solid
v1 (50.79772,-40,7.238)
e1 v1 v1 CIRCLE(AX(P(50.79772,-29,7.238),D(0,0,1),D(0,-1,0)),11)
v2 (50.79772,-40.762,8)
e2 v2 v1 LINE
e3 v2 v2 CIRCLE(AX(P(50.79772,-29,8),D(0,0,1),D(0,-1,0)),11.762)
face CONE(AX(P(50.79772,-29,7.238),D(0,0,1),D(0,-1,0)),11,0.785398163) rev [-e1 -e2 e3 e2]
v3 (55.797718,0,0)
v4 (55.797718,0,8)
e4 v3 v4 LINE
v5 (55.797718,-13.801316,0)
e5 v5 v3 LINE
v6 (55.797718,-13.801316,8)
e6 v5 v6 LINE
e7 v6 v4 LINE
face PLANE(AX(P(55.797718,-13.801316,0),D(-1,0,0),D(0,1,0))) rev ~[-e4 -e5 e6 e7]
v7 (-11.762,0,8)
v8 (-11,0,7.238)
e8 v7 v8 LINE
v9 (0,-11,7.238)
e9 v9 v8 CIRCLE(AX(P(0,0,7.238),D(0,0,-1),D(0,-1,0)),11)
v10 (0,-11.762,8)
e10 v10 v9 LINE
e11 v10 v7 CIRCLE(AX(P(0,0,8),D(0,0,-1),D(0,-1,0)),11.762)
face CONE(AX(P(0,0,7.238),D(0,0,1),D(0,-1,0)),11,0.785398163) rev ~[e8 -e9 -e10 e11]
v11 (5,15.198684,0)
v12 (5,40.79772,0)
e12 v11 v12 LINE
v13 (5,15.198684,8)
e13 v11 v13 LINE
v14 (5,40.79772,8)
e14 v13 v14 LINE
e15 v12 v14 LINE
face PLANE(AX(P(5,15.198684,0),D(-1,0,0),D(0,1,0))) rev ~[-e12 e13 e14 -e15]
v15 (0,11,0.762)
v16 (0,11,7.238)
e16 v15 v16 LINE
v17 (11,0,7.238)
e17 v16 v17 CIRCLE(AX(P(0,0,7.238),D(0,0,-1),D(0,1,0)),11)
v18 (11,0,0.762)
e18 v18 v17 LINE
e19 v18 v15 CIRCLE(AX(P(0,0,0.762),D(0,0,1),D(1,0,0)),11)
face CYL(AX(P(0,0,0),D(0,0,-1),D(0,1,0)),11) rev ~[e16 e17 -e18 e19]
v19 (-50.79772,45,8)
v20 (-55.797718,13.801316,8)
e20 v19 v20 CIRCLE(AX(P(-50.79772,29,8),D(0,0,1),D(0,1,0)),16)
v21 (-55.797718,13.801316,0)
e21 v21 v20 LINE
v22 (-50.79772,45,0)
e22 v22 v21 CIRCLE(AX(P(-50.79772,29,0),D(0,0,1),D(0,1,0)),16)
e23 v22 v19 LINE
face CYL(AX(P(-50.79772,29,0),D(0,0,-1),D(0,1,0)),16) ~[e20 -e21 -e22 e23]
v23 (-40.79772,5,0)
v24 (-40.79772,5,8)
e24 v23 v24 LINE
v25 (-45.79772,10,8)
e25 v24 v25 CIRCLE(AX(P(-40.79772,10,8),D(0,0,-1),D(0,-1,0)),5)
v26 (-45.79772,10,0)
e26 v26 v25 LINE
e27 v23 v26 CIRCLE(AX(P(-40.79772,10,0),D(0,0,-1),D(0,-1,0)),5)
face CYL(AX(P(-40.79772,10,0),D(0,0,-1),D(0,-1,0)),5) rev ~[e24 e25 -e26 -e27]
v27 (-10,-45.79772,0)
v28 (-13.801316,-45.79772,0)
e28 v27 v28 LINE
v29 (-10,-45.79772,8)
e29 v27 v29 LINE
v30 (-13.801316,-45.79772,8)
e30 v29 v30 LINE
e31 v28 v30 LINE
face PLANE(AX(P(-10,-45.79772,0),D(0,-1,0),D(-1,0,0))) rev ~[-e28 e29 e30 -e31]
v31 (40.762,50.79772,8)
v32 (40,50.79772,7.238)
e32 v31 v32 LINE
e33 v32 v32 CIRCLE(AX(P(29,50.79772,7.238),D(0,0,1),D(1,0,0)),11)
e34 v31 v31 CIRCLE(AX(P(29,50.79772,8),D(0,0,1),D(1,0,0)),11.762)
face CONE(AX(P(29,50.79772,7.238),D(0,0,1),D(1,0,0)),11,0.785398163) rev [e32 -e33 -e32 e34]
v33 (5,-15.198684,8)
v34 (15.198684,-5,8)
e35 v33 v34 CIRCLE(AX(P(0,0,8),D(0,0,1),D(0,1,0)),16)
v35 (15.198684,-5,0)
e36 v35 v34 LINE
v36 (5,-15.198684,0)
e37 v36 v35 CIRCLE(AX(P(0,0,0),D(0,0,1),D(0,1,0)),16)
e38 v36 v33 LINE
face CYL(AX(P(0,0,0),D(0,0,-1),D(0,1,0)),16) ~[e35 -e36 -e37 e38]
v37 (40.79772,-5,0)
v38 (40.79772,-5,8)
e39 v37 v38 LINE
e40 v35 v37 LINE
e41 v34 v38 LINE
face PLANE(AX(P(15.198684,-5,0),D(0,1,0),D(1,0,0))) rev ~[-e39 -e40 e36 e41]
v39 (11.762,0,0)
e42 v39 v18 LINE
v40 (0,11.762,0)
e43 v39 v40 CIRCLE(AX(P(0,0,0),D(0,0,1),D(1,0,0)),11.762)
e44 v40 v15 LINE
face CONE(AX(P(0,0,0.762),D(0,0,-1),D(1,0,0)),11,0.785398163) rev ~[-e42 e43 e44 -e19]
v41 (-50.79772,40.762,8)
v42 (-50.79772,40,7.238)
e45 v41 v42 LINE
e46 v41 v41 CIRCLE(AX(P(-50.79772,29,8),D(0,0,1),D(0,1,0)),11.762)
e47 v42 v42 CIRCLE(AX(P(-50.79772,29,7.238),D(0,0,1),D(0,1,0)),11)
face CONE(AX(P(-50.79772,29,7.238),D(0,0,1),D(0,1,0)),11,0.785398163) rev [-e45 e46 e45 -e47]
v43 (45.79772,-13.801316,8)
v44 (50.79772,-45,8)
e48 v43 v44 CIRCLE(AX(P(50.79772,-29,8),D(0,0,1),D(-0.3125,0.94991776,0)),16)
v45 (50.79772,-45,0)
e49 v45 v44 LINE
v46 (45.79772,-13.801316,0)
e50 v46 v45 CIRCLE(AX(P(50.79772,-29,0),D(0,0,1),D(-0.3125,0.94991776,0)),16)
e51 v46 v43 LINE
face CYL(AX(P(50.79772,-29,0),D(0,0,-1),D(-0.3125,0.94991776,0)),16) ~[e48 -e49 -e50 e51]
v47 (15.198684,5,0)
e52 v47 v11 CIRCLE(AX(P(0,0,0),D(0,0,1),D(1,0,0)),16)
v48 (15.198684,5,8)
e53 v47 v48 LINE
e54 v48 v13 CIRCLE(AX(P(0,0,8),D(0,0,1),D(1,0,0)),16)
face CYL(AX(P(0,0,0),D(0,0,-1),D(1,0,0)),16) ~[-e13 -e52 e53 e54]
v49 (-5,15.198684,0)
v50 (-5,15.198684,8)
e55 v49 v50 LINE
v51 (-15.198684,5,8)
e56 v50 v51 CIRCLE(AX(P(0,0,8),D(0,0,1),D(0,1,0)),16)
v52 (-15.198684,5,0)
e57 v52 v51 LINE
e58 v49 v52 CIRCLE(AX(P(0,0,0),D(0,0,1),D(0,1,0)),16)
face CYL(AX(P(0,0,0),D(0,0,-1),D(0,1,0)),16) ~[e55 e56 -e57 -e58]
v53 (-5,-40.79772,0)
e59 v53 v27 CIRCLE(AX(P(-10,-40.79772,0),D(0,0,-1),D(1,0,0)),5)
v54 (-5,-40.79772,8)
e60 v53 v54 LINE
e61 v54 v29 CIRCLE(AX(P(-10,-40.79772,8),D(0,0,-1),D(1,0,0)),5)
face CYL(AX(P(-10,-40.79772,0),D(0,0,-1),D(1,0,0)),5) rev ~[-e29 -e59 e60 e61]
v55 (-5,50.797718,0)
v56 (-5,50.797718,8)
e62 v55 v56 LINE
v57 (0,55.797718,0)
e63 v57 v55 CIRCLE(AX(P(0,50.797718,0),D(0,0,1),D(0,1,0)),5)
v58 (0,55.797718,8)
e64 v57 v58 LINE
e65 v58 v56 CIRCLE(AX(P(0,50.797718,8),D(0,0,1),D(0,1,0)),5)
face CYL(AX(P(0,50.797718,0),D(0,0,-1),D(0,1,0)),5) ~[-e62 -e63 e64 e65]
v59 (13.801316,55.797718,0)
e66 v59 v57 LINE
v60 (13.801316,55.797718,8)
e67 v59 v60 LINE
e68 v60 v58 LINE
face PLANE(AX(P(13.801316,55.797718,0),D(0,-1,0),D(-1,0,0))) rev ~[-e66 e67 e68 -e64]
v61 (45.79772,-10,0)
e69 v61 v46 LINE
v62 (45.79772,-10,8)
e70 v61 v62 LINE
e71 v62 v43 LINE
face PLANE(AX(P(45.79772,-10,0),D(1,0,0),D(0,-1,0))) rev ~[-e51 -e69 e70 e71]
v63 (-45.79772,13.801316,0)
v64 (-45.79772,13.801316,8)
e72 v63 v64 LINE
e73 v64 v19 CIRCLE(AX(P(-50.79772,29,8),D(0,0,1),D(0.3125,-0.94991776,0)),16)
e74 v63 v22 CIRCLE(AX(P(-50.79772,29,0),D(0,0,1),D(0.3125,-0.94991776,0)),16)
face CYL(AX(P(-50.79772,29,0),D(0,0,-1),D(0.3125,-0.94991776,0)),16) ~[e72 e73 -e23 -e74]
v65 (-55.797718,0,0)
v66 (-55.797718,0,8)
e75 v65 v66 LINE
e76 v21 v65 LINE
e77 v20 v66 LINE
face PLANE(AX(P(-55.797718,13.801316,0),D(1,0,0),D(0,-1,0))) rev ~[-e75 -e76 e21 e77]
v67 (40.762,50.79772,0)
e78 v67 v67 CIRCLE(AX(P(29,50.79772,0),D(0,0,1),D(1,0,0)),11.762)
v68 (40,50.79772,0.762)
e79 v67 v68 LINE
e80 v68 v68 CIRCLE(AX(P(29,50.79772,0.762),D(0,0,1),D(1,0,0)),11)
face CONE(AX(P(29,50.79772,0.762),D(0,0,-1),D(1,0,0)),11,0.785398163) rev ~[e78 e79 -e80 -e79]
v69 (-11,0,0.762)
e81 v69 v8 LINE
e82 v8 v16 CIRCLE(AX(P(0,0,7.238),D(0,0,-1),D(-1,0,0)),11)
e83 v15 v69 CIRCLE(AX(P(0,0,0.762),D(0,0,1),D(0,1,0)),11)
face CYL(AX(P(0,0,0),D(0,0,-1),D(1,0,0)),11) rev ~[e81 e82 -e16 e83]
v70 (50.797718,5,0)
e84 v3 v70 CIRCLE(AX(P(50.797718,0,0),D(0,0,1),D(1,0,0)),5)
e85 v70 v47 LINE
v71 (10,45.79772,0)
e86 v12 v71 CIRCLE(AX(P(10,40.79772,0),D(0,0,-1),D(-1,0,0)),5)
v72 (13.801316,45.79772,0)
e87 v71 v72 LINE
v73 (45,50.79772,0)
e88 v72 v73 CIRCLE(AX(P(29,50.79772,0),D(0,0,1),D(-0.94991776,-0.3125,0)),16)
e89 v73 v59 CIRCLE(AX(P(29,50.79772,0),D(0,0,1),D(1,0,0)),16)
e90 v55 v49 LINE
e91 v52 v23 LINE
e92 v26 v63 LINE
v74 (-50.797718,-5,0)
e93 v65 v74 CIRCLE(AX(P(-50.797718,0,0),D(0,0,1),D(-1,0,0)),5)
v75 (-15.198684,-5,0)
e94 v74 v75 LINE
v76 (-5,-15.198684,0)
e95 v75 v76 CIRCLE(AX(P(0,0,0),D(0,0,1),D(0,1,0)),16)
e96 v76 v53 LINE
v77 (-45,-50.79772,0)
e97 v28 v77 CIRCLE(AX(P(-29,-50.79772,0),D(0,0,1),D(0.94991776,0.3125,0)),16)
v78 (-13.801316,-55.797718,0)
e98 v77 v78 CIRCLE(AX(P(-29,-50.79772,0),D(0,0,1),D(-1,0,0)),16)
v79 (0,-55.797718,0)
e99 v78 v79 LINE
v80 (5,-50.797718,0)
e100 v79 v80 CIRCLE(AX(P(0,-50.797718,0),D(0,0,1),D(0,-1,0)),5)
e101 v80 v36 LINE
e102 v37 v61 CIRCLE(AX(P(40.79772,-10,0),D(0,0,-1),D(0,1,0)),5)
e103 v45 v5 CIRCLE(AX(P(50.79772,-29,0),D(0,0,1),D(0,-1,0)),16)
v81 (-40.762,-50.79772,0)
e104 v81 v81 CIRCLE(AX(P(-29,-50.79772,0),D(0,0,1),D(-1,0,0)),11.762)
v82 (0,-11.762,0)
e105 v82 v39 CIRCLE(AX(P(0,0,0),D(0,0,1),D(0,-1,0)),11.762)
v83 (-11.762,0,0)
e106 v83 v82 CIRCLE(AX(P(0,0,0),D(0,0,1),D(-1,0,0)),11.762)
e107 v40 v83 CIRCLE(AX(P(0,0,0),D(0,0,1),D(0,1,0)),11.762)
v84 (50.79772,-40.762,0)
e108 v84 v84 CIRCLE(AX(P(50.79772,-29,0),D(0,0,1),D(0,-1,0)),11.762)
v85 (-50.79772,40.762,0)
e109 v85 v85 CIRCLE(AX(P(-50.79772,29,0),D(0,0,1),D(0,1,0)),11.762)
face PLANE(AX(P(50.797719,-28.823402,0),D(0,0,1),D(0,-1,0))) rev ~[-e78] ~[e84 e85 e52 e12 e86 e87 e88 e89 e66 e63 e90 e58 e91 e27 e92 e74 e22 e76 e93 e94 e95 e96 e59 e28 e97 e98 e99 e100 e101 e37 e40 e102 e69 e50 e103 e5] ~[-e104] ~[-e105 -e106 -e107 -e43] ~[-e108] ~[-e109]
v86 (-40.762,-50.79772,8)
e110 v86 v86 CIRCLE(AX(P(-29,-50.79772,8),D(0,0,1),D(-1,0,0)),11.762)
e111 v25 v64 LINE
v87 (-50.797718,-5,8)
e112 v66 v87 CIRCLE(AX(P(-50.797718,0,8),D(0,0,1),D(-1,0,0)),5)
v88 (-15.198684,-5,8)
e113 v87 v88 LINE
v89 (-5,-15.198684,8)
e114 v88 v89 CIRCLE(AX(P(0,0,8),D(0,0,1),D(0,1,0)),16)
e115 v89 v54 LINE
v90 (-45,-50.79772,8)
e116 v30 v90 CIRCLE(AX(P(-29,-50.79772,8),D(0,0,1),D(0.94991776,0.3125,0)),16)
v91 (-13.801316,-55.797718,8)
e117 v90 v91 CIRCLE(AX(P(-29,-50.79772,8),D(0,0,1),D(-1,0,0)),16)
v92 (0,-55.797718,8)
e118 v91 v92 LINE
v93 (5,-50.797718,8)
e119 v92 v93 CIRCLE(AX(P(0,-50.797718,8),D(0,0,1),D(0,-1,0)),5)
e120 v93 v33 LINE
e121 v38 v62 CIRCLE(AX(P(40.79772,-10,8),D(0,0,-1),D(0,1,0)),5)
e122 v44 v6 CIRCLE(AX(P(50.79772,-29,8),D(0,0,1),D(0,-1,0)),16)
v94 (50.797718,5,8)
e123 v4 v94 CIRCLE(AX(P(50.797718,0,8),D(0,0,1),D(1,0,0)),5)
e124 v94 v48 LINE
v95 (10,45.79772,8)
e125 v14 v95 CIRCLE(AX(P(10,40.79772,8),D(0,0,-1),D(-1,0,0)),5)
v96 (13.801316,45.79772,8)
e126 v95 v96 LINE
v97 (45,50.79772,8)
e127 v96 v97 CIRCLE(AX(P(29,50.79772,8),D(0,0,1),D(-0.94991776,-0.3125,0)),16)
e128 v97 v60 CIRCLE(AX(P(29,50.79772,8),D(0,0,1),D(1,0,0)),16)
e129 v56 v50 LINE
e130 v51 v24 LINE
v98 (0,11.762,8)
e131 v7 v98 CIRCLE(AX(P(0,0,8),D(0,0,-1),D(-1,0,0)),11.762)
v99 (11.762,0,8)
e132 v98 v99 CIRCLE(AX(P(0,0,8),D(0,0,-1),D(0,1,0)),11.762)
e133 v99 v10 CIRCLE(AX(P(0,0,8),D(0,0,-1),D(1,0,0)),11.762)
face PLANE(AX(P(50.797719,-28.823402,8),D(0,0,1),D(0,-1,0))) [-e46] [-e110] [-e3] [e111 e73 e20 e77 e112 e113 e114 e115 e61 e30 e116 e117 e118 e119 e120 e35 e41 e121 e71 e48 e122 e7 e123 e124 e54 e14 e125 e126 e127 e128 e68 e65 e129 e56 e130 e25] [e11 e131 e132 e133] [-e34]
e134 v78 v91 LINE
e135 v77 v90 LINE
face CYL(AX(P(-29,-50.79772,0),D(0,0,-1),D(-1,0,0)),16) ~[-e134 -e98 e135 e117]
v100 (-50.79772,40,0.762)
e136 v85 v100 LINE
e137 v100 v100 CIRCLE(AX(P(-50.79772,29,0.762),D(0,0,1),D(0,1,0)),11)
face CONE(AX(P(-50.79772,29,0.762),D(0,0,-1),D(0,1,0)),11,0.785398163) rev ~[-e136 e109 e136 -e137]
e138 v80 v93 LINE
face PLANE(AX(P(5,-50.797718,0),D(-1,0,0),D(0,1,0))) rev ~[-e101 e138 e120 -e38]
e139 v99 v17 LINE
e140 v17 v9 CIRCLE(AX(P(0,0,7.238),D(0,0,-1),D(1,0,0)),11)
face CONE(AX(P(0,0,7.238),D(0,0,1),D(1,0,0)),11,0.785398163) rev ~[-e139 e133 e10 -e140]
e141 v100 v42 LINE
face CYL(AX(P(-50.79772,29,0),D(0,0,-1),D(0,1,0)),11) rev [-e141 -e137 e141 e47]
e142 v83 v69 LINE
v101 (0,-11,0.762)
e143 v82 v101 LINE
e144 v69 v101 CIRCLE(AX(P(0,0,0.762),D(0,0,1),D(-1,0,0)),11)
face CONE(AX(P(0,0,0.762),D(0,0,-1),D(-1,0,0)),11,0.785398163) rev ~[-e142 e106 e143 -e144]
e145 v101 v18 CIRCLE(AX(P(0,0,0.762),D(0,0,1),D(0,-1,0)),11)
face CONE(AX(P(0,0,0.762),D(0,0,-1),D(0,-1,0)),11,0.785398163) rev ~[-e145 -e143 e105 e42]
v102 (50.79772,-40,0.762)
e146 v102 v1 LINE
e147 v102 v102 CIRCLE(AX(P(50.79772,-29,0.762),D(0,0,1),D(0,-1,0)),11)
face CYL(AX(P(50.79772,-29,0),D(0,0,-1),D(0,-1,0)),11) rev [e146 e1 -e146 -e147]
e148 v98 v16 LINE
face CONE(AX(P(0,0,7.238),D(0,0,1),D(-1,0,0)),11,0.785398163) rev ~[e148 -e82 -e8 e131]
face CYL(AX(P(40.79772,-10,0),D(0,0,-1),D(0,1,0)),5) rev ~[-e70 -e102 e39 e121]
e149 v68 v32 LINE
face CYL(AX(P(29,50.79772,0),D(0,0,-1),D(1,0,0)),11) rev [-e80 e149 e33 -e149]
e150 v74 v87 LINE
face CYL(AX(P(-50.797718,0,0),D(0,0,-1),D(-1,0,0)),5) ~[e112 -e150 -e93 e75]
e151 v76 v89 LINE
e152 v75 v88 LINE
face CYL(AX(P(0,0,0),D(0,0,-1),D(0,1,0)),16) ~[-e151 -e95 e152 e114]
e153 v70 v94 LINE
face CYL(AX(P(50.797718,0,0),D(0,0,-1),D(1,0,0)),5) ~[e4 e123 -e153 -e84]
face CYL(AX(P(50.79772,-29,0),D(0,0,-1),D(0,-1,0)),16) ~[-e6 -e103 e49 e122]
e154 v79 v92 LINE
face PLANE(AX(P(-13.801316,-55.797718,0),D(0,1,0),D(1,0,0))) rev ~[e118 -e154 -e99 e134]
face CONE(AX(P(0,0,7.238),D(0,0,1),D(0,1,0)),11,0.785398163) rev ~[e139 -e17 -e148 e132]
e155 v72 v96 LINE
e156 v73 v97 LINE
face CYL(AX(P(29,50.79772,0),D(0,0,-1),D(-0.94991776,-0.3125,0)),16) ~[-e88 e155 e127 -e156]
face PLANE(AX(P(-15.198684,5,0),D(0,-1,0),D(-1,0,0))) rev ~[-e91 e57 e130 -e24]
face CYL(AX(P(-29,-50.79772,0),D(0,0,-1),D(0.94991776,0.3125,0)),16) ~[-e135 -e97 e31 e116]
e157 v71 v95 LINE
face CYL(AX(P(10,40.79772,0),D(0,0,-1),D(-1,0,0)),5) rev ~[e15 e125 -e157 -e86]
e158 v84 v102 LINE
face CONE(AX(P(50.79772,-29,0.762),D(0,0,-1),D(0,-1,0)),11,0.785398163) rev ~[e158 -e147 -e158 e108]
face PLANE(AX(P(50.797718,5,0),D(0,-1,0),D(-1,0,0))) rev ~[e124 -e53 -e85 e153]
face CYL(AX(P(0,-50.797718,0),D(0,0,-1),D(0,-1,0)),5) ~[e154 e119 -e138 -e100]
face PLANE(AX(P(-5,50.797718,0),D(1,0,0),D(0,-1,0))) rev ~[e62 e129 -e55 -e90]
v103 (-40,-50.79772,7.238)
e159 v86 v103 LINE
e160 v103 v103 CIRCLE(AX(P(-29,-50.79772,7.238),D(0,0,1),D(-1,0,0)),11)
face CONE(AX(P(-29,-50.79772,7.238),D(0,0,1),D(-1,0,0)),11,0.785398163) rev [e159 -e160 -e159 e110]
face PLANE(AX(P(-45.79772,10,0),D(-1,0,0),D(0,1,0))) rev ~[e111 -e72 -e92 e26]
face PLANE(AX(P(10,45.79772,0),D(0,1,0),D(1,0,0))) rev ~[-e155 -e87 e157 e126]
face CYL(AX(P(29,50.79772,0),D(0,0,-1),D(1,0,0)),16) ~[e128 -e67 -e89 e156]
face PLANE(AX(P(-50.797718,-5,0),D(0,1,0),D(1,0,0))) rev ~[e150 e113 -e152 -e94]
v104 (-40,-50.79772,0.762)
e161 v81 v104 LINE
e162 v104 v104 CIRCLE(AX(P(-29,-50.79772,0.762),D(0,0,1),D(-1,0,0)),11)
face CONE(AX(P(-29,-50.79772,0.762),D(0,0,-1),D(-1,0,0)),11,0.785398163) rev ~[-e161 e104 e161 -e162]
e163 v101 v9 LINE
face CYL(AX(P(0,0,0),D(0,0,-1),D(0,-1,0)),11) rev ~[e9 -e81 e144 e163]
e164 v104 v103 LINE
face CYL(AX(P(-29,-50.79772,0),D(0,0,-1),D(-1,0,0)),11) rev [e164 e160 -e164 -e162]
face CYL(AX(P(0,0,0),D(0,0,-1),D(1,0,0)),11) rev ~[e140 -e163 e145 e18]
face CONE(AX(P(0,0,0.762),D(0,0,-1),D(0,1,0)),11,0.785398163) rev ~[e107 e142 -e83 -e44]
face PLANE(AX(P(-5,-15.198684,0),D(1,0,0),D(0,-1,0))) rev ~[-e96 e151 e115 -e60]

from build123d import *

# Parameters (mm, degrees)
F0_R     = 11
F1_DEPTH = 8
F3_COUNT = 4
F4_SIZE  = 0.762


# Not quite as in the source:
# - a feature names something its author has since deleted; it is built from what else it names


with BuildPart() as f1:
    # F0 (on Top) → F1 (new body)
    with BuildSketch(Plane.XY):
        with BuildLine():
            ThreePointArc((13.801315615, 55.7977184653), (13.2015990543, 53.3296207755), (13.0000001118, 50.7977195084))
            ThreePointArc((13.0000001118, 50.7977195084), (13.2015991411, 48.2658176992), (13.8013159582, 45.7977195084))
            ThreePointArc((13.8013159582, 45.7977195084), (31.531901921, 34.9993185378), (45.0000001118, 50.7977195084))
            ThreePointArc((45.0000001118, 50.7977195084), (31.5319013788, 66.5961205659), (13.801315615, 55.7977184653))
        make_face()
        with Locations((29.0000001118, 50.7977195084)):
            Circle(F0_R, mode=Mode.SUBTRACT)
        with BuildLine():
            Line((0, 50.7977195084), (0, 16))
            ThreePointArc((0, 16), (2.5319018092, 15.7984009706), (5, 15.1986841536))
            Line((5, 15.1986841536), (5, 40.7977195084))
            ThreePointArc((5, 40.7977195084), (6.4644660941, 44.3332534143), (10, 45.7977195084))
            Line((10, 45.7977195084), (13.8013159582, 45.7977195084))
            ThreePointArc((13.8013159582, 45.7977195084), (13.2015991411, 48.2658176992), (13.0000001118, 50.7977195084))
            Line((13.0000001118, 50.7977195084), (0, 50.7977195084))
        make_face()
        with BuildLine():
            ThreePointArc((-4.9999998882, 15.1986841903), (-2.5319017511, 15.7984009799), (0, 16))
            Line((0, 16), (0, 50.7977195084))
            Line((0, 50.7977195084), (13.0000001118, 50.7977195084))
            ThreePointArc((13.0000001118, 50.7977195084), (13.2015990543, 53.3296207755), (13.801315615, 55.7977184653))
            Line((13.801315615, 55.7977184653), (1.118e-07, 55.7977184653))
            ThreePointArc((1.118e-07, 55.7977184653), (-3.5355337942, 54.3332523713), (-4.9999998882, 50.7977184653))
            Line((-4.9999998882, 50.7977184653), (-4.9999998882, 15.1986841903))
        make_face()
        with BuildLine():
            ThreePointArc((5, 15.1986841536), (2.5319018092, 15.7984009706), (0, 16))
            ThreePointArc((0, 16), (-2.5319017511, 15.7984009799), (-4.9999998882, 15.1986841903))
            ThreePointArc((-4.9999998882, 15.1986841903), (-9.3808315673, -12.9614813623), (16, 0))
            ThreePointArc((16, 0), (12.9614813968, 9.3808315196), (5, 15.1986841536))
        make_face()
        with BuildLine():
            ThreePointArc((0, 11), (7.7781745931, 7.7781745931), (11, 0))
            ThreePointArc((11, 0), (-7.7781745931, -7.7781745931), (0, 11))
        make_face(mode=Mode.SUBTRACT)
    extrude(amount=F1_DEPTH)

    # F3: F1 ×4 about axis
    f3_axis = Axis((0, 0, 23.9773858339), (0, 0, 1))


with BuildPart() as f1_1:
    add(f1.part)
    for i in range(1, F3_COUNT):
        add(f1.part.rotate(f3_axis, i * 360 / F3_COUNT))

    # F4
    f4_edges = [f1_1.edges().sort_by_distance(p)[0] for p in [
        (-18, -50.79772, 8),
        (-50.79772, 18, 8),
        (18, 50.79772, 8),
        (50.79772, -18, 8),
        (0, -11, 8),
        (50.79772, -18, 0),
        (18, 50.79772, 0),
        (-50.79772, 18, 0),
        (0, -11, 0),
        (-18, -50.79772, 0),
    ]]
    chamfer(f4_edges, length=F4_SIZE)


solid = f1_1.part
